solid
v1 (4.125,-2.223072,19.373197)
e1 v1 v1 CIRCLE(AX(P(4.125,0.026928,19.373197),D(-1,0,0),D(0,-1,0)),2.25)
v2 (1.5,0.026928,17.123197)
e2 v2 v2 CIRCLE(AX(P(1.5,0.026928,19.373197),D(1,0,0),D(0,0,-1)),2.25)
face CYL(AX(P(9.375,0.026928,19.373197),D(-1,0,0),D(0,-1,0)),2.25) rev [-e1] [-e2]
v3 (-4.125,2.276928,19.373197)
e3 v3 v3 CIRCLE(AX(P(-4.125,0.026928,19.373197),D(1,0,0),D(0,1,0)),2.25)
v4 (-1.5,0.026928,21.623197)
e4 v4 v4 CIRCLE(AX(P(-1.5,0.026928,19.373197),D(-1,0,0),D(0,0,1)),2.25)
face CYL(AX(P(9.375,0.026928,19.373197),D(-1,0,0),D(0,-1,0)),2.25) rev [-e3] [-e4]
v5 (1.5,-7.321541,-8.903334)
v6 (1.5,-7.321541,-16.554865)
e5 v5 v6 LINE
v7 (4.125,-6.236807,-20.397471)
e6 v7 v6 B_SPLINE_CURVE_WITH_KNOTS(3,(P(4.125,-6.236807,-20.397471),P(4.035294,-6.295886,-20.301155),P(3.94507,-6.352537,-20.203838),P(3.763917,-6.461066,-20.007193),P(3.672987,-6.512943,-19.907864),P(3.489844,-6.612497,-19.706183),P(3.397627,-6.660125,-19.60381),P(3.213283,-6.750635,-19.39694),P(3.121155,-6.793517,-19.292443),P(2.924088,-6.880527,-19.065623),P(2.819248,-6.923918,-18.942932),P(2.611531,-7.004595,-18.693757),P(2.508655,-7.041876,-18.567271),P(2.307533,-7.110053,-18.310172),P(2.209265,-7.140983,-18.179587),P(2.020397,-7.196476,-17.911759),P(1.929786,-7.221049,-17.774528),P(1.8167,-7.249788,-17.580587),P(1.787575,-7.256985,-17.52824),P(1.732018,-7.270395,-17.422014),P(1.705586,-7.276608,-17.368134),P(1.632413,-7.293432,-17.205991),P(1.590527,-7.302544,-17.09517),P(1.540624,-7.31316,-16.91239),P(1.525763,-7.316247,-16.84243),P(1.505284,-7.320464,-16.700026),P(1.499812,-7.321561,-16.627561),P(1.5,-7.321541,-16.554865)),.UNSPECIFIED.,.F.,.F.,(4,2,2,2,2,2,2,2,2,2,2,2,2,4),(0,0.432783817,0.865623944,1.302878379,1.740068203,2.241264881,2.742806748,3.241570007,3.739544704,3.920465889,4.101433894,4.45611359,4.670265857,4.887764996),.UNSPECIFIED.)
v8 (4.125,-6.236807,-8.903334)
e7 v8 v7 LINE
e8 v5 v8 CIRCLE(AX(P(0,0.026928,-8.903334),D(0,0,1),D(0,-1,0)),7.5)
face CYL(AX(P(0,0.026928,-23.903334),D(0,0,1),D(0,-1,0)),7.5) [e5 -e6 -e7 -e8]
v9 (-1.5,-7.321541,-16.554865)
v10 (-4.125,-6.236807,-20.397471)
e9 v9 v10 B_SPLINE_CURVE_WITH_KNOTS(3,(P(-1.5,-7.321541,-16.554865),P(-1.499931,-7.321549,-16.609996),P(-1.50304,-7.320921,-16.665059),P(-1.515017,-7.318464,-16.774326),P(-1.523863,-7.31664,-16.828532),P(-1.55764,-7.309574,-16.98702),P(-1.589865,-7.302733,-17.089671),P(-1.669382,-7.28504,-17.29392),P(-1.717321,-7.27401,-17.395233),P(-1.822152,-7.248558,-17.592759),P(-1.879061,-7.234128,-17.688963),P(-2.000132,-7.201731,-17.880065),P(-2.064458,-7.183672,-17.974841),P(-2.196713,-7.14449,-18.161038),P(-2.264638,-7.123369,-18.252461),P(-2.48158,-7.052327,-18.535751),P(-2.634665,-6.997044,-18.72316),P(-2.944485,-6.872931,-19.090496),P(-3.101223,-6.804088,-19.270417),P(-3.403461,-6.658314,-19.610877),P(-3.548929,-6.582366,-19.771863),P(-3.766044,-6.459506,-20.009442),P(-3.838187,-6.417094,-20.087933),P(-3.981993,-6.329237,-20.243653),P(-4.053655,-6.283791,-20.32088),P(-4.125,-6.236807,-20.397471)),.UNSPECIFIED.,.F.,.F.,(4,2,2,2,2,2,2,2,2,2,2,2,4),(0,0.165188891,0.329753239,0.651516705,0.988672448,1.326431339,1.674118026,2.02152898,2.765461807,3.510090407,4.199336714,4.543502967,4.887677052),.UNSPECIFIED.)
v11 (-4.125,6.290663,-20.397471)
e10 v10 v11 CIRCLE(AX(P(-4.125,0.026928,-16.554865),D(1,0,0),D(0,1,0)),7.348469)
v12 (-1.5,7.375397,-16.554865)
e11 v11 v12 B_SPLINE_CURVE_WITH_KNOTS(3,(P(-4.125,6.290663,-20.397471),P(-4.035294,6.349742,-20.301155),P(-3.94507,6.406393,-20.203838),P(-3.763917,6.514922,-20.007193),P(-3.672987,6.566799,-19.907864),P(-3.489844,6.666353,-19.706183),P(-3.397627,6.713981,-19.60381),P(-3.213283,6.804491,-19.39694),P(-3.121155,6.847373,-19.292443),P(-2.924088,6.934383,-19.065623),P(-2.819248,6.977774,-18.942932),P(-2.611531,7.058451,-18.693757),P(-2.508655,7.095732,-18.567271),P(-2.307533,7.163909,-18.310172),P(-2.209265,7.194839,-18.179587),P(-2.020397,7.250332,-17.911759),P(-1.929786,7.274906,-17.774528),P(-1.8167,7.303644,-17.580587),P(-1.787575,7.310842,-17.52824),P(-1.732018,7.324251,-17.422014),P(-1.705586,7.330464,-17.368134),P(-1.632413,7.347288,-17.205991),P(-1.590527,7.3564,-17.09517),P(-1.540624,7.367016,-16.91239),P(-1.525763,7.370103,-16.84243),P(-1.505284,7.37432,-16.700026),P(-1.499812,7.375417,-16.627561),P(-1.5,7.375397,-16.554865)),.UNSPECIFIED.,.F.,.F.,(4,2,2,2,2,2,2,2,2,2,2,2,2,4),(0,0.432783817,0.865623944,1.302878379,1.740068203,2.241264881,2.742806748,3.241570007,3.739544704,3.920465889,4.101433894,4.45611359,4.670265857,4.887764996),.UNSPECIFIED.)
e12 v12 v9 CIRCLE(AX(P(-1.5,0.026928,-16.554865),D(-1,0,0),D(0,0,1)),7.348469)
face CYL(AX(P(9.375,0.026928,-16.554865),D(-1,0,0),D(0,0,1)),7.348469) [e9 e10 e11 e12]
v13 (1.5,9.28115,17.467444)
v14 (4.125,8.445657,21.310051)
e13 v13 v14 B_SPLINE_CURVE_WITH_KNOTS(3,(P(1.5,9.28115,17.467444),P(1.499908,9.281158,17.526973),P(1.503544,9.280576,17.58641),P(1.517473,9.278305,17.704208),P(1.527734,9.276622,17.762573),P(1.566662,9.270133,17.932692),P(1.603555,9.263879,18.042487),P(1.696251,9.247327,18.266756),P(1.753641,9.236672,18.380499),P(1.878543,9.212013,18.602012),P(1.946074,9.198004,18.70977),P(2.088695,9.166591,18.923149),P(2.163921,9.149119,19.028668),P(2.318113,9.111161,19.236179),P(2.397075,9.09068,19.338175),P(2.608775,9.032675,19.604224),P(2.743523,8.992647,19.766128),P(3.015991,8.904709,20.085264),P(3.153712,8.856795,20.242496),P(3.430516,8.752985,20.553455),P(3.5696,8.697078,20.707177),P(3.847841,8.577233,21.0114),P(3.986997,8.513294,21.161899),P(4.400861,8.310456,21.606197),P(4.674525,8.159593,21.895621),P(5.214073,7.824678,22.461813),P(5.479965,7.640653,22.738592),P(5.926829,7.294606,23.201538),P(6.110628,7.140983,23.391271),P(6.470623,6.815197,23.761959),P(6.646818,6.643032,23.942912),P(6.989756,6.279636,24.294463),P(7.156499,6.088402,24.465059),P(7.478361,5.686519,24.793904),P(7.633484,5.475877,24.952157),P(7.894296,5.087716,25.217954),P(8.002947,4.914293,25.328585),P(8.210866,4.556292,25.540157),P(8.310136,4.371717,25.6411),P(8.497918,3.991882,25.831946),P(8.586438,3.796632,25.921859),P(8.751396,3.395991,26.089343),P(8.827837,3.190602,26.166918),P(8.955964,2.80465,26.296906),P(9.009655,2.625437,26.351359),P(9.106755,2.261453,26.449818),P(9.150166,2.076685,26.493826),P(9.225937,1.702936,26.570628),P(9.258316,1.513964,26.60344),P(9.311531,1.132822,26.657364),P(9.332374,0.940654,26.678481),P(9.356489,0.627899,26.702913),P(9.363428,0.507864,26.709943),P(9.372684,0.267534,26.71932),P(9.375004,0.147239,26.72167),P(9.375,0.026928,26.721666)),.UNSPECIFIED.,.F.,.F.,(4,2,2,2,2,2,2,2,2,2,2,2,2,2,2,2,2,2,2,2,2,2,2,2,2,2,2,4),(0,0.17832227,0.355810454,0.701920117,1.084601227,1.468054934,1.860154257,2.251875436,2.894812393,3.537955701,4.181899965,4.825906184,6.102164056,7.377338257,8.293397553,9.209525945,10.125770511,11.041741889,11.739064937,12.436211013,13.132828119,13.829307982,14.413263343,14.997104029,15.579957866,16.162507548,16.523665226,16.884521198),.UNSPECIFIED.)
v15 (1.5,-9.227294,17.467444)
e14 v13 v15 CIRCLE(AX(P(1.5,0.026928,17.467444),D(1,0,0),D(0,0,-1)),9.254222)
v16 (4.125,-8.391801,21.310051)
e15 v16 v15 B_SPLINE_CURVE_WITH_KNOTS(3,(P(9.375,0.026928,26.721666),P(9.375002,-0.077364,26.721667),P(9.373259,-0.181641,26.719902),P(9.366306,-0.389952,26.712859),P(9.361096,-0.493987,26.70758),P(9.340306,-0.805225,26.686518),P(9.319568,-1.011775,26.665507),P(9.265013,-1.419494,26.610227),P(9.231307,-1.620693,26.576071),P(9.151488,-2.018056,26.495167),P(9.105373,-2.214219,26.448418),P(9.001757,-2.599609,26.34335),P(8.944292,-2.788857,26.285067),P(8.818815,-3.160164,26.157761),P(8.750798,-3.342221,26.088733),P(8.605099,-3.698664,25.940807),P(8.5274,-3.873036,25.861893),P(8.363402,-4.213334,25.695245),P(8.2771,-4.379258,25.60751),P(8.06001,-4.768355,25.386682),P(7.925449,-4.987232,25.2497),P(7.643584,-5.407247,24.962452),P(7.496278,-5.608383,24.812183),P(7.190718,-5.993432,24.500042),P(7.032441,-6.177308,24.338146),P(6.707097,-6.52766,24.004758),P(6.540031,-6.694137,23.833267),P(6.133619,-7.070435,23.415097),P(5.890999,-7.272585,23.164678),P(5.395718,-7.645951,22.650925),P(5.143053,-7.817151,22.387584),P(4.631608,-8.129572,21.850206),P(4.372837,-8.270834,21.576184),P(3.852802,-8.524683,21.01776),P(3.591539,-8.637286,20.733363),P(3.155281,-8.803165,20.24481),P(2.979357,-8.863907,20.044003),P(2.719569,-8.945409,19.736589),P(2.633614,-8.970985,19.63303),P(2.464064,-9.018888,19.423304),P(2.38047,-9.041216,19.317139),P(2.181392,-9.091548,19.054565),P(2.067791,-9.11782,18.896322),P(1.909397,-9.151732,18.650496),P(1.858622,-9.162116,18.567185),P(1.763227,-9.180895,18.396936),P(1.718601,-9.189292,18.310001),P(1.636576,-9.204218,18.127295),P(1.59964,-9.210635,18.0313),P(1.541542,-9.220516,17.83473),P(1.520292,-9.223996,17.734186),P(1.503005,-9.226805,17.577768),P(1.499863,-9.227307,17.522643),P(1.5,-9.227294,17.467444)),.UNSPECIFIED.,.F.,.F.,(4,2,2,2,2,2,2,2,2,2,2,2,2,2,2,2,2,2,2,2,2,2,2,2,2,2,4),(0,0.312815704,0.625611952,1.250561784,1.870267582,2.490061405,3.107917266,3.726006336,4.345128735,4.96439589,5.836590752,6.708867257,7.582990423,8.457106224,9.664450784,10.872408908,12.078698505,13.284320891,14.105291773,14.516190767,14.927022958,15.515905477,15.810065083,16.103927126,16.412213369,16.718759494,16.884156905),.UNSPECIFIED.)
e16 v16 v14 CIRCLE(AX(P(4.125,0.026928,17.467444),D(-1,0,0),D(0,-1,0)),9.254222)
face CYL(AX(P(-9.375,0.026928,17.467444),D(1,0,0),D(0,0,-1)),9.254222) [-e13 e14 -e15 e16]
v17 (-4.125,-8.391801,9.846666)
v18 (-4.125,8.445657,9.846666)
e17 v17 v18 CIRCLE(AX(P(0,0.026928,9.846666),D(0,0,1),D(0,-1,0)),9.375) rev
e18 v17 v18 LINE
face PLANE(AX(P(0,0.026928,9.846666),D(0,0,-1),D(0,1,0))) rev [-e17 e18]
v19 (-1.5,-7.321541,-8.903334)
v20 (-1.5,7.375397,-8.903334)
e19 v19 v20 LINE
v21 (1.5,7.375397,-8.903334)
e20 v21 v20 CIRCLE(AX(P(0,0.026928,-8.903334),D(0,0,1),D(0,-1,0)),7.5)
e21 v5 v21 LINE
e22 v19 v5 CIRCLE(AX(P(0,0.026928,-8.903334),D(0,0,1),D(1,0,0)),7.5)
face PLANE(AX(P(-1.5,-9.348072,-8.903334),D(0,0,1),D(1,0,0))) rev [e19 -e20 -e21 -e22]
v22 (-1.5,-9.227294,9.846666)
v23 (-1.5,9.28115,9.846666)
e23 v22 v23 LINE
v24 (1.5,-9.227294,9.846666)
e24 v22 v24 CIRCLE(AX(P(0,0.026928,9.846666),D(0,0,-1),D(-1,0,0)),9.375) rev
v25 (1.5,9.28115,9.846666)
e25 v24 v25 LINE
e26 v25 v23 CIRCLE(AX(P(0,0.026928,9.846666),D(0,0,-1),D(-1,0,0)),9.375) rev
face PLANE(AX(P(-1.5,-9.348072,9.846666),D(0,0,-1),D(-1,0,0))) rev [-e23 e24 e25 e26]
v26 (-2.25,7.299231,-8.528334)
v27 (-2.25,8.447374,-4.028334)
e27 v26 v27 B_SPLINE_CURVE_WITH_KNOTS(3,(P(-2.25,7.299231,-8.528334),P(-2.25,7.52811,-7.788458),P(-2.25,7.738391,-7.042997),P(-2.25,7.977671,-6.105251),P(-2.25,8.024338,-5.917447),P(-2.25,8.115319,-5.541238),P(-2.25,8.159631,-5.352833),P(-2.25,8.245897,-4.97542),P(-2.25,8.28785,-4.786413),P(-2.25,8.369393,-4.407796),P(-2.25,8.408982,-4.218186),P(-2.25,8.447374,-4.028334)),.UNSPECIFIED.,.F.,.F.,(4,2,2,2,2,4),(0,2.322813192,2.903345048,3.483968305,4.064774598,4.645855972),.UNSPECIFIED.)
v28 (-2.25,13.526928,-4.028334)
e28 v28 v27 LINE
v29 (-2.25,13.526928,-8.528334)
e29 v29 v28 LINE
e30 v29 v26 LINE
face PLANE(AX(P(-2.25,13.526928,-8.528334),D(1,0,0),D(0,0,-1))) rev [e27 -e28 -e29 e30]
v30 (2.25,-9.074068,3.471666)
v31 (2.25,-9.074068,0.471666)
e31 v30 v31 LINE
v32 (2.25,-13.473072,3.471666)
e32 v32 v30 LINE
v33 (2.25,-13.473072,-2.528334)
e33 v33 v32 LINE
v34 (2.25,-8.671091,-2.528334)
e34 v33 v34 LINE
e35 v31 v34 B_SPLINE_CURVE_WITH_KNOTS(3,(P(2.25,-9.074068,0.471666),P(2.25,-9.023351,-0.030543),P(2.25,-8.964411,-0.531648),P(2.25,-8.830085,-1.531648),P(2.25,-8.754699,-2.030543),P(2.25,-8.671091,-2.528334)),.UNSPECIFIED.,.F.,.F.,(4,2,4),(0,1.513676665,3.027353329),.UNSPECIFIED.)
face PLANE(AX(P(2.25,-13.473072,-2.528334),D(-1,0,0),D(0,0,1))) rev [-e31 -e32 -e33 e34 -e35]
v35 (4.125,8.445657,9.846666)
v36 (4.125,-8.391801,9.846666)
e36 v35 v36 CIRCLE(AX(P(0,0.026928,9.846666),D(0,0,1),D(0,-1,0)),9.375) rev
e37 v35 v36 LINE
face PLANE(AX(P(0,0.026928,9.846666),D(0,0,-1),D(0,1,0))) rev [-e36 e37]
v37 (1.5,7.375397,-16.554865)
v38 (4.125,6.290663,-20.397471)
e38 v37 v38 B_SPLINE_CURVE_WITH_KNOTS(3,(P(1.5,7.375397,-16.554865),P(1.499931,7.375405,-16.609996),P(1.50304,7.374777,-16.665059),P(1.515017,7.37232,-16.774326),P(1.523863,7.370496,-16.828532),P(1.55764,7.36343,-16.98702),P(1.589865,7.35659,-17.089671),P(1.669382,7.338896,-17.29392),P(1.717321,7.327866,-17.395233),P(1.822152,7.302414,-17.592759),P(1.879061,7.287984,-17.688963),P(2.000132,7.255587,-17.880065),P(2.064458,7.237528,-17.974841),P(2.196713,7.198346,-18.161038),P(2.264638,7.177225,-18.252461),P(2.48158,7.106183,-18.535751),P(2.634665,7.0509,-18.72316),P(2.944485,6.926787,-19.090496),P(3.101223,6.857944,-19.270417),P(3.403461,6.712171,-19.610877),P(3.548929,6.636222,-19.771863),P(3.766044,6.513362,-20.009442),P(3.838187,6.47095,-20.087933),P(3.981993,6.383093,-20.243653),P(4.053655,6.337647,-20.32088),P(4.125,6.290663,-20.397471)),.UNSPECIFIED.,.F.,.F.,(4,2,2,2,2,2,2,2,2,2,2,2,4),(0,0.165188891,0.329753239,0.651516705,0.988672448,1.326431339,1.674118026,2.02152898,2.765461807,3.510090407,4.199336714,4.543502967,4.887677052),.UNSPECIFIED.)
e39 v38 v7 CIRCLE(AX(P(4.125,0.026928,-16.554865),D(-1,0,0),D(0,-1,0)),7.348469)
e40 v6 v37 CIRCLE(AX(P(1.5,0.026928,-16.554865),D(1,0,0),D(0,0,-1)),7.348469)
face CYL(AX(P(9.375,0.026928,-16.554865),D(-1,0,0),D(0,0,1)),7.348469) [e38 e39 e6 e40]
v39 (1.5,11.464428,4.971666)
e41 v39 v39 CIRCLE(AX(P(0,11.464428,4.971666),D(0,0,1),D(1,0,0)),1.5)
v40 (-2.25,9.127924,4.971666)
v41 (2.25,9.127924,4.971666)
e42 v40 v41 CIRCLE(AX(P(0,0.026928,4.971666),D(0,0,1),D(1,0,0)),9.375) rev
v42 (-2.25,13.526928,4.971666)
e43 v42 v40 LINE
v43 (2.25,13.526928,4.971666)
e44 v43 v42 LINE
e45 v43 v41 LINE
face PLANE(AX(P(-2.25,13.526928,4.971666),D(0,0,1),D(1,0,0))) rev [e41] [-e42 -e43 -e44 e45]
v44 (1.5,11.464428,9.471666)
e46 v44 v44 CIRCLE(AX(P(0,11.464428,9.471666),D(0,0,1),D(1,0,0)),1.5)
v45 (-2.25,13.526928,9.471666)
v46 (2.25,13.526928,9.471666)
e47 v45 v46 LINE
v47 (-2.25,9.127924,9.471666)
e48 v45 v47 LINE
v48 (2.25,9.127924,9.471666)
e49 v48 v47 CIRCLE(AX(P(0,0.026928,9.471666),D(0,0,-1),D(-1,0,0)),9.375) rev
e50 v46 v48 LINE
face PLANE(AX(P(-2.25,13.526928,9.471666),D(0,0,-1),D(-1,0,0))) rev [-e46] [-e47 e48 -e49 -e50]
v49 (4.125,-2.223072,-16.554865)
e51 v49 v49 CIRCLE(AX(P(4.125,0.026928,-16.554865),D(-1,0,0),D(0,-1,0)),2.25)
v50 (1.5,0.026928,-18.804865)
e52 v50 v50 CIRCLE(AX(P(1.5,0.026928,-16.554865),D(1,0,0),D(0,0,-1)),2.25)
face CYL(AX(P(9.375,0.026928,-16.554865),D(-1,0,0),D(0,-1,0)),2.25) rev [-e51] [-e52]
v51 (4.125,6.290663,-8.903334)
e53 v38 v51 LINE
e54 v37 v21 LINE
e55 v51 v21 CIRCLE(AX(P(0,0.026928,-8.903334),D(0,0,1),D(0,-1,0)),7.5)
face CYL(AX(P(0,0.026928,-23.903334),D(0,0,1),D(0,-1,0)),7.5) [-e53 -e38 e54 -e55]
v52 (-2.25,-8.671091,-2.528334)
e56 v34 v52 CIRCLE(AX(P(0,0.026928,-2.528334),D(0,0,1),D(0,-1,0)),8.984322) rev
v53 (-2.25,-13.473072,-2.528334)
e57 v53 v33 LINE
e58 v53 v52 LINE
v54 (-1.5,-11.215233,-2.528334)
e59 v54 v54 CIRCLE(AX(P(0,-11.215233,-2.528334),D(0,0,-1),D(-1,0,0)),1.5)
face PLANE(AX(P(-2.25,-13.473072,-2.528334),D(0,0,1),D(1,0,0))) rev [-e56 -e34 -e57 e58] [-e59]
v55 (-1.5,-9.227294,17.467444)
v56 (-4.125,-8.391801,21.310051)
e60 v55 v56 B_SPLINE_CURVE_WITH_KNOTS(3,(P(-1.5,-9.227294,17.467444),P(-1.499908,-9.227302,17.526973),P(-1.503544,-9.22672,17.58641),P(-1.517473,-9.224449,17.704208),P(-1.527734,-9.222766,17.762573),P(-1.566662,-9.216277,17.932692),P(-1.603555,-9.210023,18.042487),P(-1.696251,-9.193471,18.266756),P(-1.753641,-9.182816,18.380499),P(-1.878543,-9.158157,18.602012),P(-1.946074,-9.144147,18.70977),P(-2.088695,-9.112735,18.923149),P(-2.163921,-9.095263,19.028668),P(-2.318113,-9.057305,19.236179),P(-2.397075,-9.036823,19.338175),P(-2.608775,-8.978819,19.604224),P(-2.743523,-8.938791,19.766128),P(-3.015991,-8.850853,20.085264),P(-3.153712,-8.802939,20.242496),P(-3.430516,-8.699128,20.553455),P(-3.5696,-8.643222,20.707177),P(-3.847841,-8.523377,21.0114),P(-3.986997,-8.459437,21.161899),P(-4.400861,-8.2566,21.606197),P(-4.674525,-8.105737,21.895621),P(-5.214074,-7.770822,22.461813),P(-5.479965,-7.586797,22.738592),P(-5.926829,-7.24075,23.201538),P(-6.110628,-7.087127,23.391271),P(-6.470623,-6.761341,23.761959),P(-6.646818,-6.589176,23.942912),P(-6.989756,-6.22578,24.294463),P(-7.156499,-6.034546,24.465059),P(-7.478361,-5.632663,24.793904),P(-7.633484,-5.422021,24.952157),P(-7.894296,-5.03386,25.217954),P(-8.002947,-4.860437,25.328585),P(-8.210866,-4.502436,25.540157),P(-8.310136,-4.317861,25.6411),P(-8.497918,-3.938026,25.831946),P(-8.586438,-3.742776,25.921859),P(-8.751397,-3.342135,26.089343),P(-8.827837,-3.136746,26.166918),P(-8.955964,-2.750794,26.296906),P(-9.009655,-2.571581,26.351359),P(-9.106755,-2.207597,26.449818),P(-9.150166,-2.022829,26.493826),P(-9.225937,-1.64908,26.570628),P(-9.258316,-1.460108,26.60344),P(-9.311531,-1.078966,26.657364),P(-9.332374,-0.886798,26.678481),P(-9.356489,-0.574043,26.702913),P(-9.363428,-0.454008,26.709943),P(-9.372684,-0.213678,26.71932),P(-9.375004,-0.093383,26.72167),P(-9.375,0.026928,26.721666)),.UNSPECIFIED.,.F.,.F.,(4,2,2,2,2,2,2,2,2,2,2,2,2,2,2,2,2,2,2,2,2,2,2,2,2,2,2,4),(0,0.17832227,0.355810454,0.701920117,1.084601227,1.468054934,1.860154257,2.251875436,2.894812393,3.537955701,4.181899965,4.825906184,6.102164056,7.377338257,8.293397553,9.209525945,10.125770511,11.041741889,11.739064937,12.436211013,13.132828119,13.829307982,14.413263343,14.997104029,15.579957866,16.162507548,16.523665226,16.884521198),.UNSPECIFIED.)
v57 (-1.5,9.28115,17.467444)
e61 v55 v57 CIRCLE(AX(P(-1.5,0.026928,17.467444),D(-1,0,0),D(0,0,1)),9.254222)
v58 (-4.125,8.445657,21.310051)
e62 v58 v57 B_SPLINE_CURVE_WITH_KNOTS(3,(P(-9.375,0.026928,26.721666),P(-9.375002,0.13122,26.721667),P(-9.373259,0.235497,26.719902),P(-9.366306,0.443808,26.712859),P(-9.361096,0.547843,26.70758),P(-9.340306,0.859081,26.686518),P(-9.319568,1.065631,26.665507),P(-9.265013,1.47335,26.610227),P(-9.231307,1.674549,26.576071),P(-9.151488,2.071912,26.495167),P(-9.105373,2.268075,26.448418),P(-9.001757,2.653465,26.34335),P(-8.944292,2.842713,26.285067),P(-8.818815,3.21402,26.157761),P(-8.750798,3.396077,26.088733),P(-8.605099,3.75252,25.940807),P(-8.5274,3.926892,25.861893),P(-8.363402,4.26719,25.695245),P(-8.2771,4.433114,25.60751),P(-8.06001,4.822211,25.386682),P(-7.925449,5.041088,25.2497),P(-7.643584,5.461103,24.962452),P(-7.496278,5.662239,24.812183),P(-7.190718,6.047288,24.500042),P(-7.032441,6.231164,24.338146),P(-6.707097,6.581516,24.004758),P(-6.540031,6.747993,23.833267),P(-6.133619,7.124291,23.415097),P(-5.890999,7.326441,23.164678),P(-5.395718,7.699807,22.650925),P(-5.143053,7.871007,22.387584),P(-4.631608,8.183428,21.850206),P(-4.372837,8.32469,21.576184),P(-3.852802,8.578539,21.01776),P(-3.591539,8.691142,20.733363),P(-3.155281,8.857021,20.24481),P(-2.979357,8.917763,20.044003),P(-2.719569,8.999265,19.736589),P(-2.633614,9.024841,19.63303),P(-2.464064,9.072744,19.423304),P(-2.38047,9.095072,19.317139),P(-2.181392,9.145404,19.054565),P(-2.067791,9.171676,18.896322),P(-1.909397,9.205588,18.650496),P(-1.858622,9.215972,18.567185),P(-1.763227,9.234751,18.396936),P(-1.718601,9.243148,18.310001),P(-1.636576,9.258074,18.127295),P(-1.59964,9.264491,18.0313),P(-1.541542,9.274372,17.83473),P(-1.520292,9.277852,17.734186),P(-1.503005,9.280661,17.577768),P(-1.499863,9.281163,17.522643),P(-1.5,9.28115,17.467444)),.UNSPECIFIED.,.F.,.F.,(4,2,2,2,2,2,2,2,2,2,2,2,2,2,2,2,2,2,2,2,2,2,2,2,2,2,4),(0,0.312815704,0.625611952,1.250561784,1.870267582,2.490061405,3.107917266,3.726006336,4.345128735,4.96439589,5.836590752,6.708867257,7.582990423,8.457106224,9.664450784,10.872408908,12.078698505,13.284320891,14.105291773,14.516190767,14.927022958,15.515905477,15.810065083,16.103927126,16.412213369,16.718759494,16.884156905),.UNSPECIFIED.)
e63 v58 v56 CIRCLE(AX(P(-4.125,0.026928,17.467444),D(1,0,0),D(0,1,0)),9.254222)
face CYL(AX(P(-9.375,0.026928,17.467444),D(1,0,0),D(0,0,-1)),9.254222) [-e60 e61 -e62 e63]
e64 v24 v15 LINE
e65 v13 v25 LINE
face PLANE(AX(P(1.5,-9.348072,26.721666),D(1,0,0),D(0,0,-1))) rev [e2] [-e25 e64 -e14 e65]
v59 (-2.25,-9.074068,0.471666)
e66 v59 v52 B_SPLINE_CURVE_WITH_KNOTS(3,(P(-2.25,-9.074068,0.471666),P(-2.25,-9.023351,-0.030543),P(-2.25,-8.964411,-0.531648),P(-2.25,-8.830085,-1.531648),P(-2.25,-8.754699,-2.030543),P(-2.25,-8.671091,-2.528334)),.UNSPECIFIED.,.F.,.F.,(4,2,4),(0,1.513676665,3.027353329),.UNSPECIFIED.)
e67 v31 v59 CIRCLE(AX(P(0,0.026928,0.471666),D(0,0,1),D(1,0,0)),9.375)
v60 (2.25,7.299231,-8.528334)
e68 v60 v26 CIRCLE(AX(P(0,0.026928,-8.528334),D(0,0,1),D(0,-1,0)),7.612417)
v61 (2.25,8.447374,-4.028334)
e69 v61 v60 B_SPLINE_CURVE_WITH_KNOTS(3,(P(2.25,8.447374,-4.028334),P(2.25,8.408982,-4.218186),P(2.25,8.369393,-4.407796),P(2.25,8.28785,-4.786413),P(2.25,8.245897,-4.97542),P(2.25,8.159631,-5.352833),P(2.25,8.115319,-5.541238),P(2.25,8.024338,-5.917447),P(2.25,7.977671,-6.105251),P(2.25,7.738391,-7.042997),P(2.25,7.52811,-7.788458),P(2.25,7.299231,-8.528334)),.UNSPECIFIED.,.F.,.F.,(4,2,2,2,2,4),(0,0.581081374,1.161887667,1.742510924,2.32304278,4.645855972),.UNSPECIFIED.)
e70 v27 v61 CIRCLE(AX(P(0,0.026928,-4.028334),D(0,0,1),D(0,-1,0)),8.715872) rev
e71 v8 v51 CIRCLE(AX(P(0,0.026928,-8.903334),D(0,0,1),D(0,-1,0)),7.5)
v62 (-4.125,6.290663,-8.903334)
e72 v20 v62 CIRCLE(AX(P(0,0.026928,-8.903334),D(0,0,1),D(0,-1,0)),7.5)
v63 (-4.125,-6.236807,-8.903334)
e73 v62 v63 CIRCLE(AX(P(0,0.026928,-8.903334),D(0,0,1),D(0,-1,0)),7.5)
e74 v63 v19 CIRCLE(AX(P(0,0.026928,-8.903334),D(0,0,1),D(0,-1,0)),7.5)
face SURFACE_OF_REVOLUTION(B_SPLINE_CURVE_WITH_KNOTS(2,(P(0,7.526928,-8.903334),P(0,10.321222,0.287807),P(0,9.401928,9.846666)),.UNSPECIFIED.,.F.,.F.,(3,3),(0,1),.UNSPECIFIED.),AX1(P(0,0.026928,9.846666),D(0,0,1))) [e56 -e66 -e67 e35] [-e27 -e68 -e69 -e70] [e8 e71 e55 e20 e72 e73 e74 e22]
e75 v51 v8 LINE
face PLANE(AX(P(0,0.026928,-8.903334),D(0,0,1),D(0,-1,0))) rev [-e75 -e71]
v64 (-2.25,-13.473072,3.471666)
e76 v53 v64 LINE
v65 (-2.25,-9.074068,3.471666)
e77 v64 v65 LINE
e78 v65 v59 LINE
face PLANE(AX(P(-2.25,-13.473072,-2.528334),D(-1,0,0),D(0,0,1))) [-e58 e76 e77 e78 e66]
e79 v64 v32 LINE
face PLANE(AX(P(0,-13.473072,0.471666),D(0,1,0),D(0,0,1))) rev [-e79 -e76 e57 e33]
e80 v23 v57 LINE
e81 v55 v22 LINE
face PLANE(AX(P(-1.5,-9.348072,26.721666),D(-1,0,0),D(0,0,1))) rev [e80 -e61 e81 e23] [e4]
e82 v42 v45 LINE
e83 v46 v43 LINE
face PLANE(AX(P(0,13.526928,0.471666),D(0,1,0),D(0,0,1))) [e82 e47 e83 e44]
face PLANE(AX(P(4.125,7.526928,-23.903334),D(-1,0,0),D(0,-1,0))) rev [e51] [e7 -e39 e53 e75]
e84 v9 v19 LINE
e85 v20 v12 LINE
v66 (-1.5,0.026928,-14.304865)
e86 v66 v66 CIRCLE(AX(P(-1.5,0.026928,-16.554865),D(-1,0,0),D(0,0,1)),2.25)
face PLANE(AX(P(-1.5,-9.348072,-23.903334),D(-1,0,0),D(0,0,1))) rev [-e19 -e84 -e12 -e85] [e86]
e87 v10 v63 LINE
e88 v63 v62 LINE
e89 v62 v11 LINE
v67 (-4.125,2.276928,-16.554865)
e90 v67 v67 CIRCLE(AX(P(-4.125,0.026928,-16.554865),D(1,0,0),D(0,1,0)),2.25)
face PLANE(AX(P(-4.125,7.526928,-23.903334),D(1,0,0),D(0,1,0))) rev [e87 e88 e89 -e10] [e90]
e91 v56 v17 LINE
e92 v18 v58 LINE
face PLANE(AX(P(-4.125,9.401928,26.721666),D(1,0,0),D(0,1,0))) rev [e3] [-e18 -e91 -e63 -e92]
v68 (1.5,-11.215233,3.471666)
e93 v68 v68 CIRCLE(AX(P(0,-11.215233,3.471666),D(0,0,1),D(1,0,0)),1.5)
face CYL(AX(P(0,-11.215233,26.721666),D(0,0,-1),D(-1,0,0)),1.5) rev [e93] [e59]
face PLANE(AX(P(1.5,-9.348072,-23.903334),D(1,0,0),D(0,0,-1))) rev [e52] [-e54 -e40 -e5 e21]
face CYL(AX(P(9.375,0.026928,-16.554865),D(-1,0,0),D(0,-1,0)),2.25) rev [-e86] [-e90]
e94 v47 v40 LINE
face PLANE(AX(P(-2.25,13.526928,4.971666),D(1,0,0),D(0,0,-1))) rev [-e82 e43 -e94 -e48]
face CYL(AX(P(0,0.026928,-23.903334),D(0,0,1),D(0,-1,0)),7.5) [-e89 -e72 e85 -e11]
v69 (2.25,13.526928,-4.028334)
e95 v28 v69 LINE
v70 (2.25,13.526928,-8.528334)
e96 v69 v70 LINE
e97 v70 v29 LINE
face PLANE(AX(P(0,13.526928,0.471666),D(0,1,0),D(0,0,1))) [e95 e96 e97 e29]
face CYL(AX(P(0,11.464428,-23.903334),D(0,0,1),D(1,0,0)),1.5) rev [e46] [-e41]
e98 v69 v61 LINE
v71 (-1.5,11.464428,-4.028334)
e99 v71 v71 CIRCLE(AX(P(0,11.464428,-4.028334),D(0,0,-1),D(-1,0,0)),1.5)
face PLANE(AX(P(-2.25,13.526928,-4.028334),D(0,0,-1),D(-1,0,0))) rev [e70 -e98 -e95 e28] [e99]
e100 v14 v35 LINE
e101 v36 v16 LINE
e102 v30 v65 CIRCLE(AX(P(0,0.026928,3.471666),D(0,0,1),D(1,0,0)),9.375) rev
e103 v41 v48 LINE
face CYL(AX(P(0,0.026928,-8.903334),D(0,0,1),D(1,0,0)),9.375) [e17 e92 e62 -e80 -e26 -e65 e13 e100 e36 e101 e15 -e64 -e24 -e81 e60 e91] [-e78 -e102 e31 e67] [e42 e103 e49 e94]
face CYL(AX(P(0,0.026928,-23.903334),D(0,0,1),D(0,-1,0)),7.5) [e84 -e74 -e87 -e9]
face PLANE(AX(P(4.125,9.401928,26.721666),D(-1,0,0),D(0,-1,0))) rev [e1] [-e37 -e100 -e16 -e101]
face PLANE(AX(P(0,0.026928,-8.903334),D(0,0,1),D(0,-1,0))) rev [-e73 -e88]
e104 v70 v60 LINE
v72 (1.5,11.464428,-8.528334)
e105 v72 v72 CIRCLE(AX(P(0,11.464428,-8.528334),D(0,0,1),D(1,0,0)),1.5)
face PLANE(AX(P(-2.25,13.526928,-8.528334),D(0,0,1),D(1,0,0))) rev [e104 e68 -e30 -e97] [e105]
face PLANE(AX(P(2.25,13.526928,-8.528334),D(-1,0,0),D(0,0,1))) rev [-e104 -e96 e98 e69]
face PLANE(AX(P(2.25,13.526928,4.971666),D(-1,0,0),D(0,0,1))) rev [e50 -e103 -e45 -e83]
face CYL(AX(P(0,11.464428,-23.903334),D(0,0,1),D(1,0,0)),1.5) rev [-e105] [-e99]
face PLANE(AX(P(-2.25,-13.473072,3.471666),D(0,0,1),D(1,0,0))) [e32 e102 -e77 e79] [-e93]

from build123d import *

# Parameters (mm, degrees)
SKETCH1_W                = 11
SKETCH1_H                = 25
BOSS_EXTRUDE1_DEPTH      = 35
CUT_EXTRUDE9_DEPTH       = 31.868357473
CUT_EXTRUDE9_DEPTH_BACK  = 31.868357473
SKETCH6_R                = 20
SKETCH6_R_2              = 12.5
SKETCH7_W                = 11
SKETCH7_H                = 20
BOSS_EXTRUDE3_DEPTH      = 20
SKETCH8_R                = 15
SKETCH8_R_2              = 10
CUT_EXTRUDE10_DEPTH      = 51.682837382
CUT_EXTRUDE11_DEPTH      = 40.210967919
CUT_EXTRUDE11_DEPTH_BACK = 40.210967919
SKETCH9_W                = 4
SKETCH9_H                = 20
SKETCH9_H_2              = 22.5
CUT_EXTRUDE15_START      = -3.5
CUT_EXTRUDE15_DEPTH      = 11
CUT_EXTRUDE16_DEPTH      = 40.893608668
CUT_EXTRUDE16_DEPTH_BACK = 40.893608668
CUT_EXTRUDE17_DEPTH      = 42.29467294
CUT_EXTRUDE17_DEPTH_BACK = 42.29467294
SKETCH14_R               = 3
SKETCH15_W               = 6
SKETCH15_H               = 8
BOSS_EXTRUDE5_DEPTH      = 18
SKETCH17_R               = 2
CUT_EXTRUDE19_DEPTH      = 45.735332948
SKETCH20_W               = 6
SKETCH20_H               = 6
BOSS_EXTRUDE7_DEPTH      = 18
SKETCH21_R               = 2
CUT_EXTRUDE22_DEPTH      = 50.603427453
SCALE1_SCALE             = 0.75


# Read off the part's stored shape, not the designer's step: Cut-Extrude15
with BuildPart() as part:
    # Sketch1 → Boss-Extrude1 (new body)
    with BuildSketch(Plane.XY):
        Rectangle(SKETCH1_W, SKETCH1_H)
    extrude(amount=BOSS_EXTRUDE1_DEPTH)


with BuildPart() as body_2:
    # Sketch2 → Revolve1 (revolve)
    with BuildSketch(Plane(origin=(0, 0, 0), x_dir=(0, 0, -1), z_dir=(1, 0, 0))):
        with BuildLine():
            Line((-12.5, 0), (12.5, 0))
            Line((12.5, 0), (12.5, 10))
            add(Edge.make_bspline(
                [(-12.5, 12.5), (0.245145169, 13.725725845), (12.5, 10)],
                knots=[0, 0, 0, 1, 1, 1], degree=2))
            Line((-12.5, 12.5), (-12.5, 0))
        make_face()
    revolve(axis=Axis((0, 0, 12.5), (0, 0, -1)))


with BuildPart() as cut_extrude9_tool:
    # Sketch6 → Cut-Extrude9 (new, two sides: drawn at the far end of the back side and taken through both)
    with BuildSketch(Plane.XY.offset(12.5).offset(-CUT_EXTRUDE9_DEPTH_BACK)):
        Circle(SKETCH6_R)
        with Locations(Location((0, 0, 0), (0, 0, 270))):
            Circle(SKETCH6_R_2, mode=Mode.SUBTRACT)
    extrude(amount=CUT_EXTRUDE9_DEPTH + CUT_EXTRUDE9_DEPTH_BACK)


with BuildPart() as part_1:
    add(part.part)

    # Cut-Extrude9: cut by cut_extrude9_tool
    add(cut_extrude9_tool.part, mode=Mode.SUBTRACT)


with BuildPart() as body_2_1:
    add(body_2.part)

    # Cut-Extrude9: cut by cut_extrude9_tool
    add(cut_extrude9_tool.part, mode=Mode.SUBTRACT)

    # Sketch7 → Boss-Extrude3 (add)
    with BuildSketch(Plane(origin=(0, 0, -12.5), x_dir=(-1, 0, 0), z_dir=(0, 0, -1))):
        Rectangle(SKETCH7_W, SKETCH7_H)
    extrude(amount=BOSS_EXTRUDE3_DEPTH)

    # Sketch8 → Cut-Extrude10 (cut, through all)
    with BuildSketch(Plane(origin=(0, 0, -12.5), x_dir=(-1, 0, 0), z_dir=(0, 0, -1))):
        Circle(SKETCH8_R)
        Circle(SKETCH8_R_2, mode=Mode.SUBTRACT)
    extrude(amount=CUT_EXTRUDE10_DEPTH, mode=Mode.SUBTRACT)


with BuildPart() as cut_extrude11_tool:
    # Sketch9 → Cut-Extrude11 (new, two sides: drawn at the far end of the back side and taken through both)
    with BuildSketch(Plane(origin=(0, 0, 0), x_dir=(1, 0, 0), z_dir=(0, 1, 0)).offset(-CUT_EXTRUDE11_DEPTH_BACK)):
        with Locations((0, 22.5)):
            Rectangle(SKETCH9_W, SKETCH9_H)
        with Locations((0, -23.75)):
            Rectangle(SKETCH9_W, SKETCH9_H_2)
    extrude(amount=CUT_EXTRUDE11_DEPTH + CUT_EXTRUDE11_DEPTH_BACK)


with BuildPart() as part_2:
    add(part_1.part)

    # Cut-Extrude11: cut by cut_extrude11_tool
    add(cut_extrude11_tool.part, mode=Mode.SUBTRACT)

    # Cut-Extrude15 outline → Cut-Extrude15 (cut)
    with BuildSketch(Plane(origin=(-2, 0, 0), x_dir=(0, 0, -1), z_dir=(1, 0, 0)).offset(CUT_EXTRUDE15_START)):
        with BuildLine():
            Line((-35, 12.338962679), (-35, -1.7e-08))
            ThreePointArc((-35, -1.7e-08), (-31.38600151, 8.724964177), (-22.661037321, 12.338962679))
            Line((-22.661037321, 12.338962679), (-35, 12.338962679))
        make_face()
        with BuildLine():
            Line((-35, -12.338962679), (-22.661037321, -12.338962679))
            ThreePointArc((-22.661037321, -12.338962679), (-31.386001498, -8.724964189), (-35, -1.7e-08))
            Line((-35, -1.7e-08), (-35, -12.338962679))
        make_face()
    extrude(amount=CUT_EXTRUDE15_DEPTH, mode=Mode.SUBTRACT)


with BuildPart() as body_2_2:
    add(body_2_1.part)

    # Cut-Extrude11: cut by cut_extrude11_tool
    add(cut_extrude11_tool.part, mode=Mode.SUBTRACT)

    # Sketch12 → Cut-Extrude16 (cut, two sides: drawn at the far end of the back side and taken through both)
    with BuildSketch(Plane.ZY.offset(-2).offset(-CUT_EXTRUDE16_DEPTH_BACK)):
        with BuildLine():
            ThreePointArc((-32.5, 0), (-29.630244259, 6.92820323), (-22.702041029, 9.797958971))
            Line((-22.702041029, 9.797958971), (-32.5, 9.797958971))
            Line((-32.5, 9.797958971), (-32.5, 0))
        make_face()
        with BuildLine():
            ThreePointArc((-22.702041029, -9.797958971), (-29.630244259, -6.92820323), (-32.5, 0))
            Line((-32.5, 0), (-32.5, -9.797958971))
            Line((-32.5, -9.797958971), (-22.702041029, -9.797958971))
        make_face()
    extrude(amount=CUT_EXTRUDE16_DEPTH + CUT_EXTRUDE16_DEPTH_BACK, mode=Mode.SUBTRACT)


with BuildPart() as cut_extrude17_tool:
    # Sketch14 → Cut-Extrude17 (new, two sides: drawn at the far end of the back side and taken through both)
    with BuildSketch(Plane.ZY.offset(5.5).offset(-CUT_EXTRUDE17_DEPTH_BACK)):
        with Locations(Location((-22.702041029, 0, 0), (0, 0, 270))):
            Circle(SKETCH14_R)
        with Locations(Location((25.202041029, 0, 0), (0, 0, 270))):
            Circle(SKETCH14_R)
    extrude(amount=CUT_EXTRUDE17_DEPTH + CUT_EXTRUDE17_DEPTH_BACK)


with BuildPart() as part_3:
    add(part_2.part)

    # Cut-Extrude17: cut by cut_extrude17_tool
    add(cut_extrude17_tool.part, mode=Mode.SUBTRACT)



with BuildPart() as body_2_3:
    add(body_2_2.part)

    # Cut-Extrude17: cut by cut_extrude17_tool
    add(cut_extrude17_tool.part, mode=Mode.SUBTRACT)


with BuildPart() as part_4:
    add(part_3.part)

    add(body_2_3.part)  # Boss-Extrude5 merges body 2
    # Sketch15 → Boss-Extrude5 (add)
    with BuildSketch(Plane(origin=(0, 0, 0), x_dir=(1, 0, 0), z_dir=(0, 1, 0))):
        Rectangle(SKETCH15_W, SKETCH15_H)
    extrude(amount=-BOSS_EXTRUDE5_DEPTH)

    # Sketch17 → Cut-Extrude19 (cut, through all)
    with BuildSketch(Plane(origin=(0, 0, -4), x_dir=(-1, 0, 0), z_dir=(0, 0, -1))):
        with Locations((0, -14.989547851)):
            Circle(SKETCH17_R)
    extrude(amount=-CUT_EXTRUDE19_DEPTH, mode=Mode.SUBTRACT)

    # Sketch20 → Boss-Extrude7 (add)
    with BuildSketch(Plane(origin=(0, 0, 0), x_dir=(1, 0, 0), z_dir=(0, 1, 0))):
        with Locations((0, 9)):
            Rectangle(SKETCH20_W, SKETCH20_H)
        with Locations((0, -9)):
            Rectangle(SKETCH20_W, SKETCH20_H)
    extrude(amount=BOSS_EXTRUDE7_DEPTH)

    # Sketch21 → Cut-Extrude22 (cut, through all)
    with BuildSketch(Plane.XY.offset(12)):
        with Locations((0, 15.25)):
            Circle(SKETCH21_R)
    extrude(amount=-CUT_EXTRUDE22_DEPTH, mode=Mode.SUBTRACT)


with BuildPart() as part_5:
    # Scale1: scaled about (2.31e-07, 0.10771387, 1.886694497)
    add(part_4.part.scale(SCALE1_SCALE).moved(Location((5.8e-08, 0.026928468, 0.471673624))))


solid = part_5.part
